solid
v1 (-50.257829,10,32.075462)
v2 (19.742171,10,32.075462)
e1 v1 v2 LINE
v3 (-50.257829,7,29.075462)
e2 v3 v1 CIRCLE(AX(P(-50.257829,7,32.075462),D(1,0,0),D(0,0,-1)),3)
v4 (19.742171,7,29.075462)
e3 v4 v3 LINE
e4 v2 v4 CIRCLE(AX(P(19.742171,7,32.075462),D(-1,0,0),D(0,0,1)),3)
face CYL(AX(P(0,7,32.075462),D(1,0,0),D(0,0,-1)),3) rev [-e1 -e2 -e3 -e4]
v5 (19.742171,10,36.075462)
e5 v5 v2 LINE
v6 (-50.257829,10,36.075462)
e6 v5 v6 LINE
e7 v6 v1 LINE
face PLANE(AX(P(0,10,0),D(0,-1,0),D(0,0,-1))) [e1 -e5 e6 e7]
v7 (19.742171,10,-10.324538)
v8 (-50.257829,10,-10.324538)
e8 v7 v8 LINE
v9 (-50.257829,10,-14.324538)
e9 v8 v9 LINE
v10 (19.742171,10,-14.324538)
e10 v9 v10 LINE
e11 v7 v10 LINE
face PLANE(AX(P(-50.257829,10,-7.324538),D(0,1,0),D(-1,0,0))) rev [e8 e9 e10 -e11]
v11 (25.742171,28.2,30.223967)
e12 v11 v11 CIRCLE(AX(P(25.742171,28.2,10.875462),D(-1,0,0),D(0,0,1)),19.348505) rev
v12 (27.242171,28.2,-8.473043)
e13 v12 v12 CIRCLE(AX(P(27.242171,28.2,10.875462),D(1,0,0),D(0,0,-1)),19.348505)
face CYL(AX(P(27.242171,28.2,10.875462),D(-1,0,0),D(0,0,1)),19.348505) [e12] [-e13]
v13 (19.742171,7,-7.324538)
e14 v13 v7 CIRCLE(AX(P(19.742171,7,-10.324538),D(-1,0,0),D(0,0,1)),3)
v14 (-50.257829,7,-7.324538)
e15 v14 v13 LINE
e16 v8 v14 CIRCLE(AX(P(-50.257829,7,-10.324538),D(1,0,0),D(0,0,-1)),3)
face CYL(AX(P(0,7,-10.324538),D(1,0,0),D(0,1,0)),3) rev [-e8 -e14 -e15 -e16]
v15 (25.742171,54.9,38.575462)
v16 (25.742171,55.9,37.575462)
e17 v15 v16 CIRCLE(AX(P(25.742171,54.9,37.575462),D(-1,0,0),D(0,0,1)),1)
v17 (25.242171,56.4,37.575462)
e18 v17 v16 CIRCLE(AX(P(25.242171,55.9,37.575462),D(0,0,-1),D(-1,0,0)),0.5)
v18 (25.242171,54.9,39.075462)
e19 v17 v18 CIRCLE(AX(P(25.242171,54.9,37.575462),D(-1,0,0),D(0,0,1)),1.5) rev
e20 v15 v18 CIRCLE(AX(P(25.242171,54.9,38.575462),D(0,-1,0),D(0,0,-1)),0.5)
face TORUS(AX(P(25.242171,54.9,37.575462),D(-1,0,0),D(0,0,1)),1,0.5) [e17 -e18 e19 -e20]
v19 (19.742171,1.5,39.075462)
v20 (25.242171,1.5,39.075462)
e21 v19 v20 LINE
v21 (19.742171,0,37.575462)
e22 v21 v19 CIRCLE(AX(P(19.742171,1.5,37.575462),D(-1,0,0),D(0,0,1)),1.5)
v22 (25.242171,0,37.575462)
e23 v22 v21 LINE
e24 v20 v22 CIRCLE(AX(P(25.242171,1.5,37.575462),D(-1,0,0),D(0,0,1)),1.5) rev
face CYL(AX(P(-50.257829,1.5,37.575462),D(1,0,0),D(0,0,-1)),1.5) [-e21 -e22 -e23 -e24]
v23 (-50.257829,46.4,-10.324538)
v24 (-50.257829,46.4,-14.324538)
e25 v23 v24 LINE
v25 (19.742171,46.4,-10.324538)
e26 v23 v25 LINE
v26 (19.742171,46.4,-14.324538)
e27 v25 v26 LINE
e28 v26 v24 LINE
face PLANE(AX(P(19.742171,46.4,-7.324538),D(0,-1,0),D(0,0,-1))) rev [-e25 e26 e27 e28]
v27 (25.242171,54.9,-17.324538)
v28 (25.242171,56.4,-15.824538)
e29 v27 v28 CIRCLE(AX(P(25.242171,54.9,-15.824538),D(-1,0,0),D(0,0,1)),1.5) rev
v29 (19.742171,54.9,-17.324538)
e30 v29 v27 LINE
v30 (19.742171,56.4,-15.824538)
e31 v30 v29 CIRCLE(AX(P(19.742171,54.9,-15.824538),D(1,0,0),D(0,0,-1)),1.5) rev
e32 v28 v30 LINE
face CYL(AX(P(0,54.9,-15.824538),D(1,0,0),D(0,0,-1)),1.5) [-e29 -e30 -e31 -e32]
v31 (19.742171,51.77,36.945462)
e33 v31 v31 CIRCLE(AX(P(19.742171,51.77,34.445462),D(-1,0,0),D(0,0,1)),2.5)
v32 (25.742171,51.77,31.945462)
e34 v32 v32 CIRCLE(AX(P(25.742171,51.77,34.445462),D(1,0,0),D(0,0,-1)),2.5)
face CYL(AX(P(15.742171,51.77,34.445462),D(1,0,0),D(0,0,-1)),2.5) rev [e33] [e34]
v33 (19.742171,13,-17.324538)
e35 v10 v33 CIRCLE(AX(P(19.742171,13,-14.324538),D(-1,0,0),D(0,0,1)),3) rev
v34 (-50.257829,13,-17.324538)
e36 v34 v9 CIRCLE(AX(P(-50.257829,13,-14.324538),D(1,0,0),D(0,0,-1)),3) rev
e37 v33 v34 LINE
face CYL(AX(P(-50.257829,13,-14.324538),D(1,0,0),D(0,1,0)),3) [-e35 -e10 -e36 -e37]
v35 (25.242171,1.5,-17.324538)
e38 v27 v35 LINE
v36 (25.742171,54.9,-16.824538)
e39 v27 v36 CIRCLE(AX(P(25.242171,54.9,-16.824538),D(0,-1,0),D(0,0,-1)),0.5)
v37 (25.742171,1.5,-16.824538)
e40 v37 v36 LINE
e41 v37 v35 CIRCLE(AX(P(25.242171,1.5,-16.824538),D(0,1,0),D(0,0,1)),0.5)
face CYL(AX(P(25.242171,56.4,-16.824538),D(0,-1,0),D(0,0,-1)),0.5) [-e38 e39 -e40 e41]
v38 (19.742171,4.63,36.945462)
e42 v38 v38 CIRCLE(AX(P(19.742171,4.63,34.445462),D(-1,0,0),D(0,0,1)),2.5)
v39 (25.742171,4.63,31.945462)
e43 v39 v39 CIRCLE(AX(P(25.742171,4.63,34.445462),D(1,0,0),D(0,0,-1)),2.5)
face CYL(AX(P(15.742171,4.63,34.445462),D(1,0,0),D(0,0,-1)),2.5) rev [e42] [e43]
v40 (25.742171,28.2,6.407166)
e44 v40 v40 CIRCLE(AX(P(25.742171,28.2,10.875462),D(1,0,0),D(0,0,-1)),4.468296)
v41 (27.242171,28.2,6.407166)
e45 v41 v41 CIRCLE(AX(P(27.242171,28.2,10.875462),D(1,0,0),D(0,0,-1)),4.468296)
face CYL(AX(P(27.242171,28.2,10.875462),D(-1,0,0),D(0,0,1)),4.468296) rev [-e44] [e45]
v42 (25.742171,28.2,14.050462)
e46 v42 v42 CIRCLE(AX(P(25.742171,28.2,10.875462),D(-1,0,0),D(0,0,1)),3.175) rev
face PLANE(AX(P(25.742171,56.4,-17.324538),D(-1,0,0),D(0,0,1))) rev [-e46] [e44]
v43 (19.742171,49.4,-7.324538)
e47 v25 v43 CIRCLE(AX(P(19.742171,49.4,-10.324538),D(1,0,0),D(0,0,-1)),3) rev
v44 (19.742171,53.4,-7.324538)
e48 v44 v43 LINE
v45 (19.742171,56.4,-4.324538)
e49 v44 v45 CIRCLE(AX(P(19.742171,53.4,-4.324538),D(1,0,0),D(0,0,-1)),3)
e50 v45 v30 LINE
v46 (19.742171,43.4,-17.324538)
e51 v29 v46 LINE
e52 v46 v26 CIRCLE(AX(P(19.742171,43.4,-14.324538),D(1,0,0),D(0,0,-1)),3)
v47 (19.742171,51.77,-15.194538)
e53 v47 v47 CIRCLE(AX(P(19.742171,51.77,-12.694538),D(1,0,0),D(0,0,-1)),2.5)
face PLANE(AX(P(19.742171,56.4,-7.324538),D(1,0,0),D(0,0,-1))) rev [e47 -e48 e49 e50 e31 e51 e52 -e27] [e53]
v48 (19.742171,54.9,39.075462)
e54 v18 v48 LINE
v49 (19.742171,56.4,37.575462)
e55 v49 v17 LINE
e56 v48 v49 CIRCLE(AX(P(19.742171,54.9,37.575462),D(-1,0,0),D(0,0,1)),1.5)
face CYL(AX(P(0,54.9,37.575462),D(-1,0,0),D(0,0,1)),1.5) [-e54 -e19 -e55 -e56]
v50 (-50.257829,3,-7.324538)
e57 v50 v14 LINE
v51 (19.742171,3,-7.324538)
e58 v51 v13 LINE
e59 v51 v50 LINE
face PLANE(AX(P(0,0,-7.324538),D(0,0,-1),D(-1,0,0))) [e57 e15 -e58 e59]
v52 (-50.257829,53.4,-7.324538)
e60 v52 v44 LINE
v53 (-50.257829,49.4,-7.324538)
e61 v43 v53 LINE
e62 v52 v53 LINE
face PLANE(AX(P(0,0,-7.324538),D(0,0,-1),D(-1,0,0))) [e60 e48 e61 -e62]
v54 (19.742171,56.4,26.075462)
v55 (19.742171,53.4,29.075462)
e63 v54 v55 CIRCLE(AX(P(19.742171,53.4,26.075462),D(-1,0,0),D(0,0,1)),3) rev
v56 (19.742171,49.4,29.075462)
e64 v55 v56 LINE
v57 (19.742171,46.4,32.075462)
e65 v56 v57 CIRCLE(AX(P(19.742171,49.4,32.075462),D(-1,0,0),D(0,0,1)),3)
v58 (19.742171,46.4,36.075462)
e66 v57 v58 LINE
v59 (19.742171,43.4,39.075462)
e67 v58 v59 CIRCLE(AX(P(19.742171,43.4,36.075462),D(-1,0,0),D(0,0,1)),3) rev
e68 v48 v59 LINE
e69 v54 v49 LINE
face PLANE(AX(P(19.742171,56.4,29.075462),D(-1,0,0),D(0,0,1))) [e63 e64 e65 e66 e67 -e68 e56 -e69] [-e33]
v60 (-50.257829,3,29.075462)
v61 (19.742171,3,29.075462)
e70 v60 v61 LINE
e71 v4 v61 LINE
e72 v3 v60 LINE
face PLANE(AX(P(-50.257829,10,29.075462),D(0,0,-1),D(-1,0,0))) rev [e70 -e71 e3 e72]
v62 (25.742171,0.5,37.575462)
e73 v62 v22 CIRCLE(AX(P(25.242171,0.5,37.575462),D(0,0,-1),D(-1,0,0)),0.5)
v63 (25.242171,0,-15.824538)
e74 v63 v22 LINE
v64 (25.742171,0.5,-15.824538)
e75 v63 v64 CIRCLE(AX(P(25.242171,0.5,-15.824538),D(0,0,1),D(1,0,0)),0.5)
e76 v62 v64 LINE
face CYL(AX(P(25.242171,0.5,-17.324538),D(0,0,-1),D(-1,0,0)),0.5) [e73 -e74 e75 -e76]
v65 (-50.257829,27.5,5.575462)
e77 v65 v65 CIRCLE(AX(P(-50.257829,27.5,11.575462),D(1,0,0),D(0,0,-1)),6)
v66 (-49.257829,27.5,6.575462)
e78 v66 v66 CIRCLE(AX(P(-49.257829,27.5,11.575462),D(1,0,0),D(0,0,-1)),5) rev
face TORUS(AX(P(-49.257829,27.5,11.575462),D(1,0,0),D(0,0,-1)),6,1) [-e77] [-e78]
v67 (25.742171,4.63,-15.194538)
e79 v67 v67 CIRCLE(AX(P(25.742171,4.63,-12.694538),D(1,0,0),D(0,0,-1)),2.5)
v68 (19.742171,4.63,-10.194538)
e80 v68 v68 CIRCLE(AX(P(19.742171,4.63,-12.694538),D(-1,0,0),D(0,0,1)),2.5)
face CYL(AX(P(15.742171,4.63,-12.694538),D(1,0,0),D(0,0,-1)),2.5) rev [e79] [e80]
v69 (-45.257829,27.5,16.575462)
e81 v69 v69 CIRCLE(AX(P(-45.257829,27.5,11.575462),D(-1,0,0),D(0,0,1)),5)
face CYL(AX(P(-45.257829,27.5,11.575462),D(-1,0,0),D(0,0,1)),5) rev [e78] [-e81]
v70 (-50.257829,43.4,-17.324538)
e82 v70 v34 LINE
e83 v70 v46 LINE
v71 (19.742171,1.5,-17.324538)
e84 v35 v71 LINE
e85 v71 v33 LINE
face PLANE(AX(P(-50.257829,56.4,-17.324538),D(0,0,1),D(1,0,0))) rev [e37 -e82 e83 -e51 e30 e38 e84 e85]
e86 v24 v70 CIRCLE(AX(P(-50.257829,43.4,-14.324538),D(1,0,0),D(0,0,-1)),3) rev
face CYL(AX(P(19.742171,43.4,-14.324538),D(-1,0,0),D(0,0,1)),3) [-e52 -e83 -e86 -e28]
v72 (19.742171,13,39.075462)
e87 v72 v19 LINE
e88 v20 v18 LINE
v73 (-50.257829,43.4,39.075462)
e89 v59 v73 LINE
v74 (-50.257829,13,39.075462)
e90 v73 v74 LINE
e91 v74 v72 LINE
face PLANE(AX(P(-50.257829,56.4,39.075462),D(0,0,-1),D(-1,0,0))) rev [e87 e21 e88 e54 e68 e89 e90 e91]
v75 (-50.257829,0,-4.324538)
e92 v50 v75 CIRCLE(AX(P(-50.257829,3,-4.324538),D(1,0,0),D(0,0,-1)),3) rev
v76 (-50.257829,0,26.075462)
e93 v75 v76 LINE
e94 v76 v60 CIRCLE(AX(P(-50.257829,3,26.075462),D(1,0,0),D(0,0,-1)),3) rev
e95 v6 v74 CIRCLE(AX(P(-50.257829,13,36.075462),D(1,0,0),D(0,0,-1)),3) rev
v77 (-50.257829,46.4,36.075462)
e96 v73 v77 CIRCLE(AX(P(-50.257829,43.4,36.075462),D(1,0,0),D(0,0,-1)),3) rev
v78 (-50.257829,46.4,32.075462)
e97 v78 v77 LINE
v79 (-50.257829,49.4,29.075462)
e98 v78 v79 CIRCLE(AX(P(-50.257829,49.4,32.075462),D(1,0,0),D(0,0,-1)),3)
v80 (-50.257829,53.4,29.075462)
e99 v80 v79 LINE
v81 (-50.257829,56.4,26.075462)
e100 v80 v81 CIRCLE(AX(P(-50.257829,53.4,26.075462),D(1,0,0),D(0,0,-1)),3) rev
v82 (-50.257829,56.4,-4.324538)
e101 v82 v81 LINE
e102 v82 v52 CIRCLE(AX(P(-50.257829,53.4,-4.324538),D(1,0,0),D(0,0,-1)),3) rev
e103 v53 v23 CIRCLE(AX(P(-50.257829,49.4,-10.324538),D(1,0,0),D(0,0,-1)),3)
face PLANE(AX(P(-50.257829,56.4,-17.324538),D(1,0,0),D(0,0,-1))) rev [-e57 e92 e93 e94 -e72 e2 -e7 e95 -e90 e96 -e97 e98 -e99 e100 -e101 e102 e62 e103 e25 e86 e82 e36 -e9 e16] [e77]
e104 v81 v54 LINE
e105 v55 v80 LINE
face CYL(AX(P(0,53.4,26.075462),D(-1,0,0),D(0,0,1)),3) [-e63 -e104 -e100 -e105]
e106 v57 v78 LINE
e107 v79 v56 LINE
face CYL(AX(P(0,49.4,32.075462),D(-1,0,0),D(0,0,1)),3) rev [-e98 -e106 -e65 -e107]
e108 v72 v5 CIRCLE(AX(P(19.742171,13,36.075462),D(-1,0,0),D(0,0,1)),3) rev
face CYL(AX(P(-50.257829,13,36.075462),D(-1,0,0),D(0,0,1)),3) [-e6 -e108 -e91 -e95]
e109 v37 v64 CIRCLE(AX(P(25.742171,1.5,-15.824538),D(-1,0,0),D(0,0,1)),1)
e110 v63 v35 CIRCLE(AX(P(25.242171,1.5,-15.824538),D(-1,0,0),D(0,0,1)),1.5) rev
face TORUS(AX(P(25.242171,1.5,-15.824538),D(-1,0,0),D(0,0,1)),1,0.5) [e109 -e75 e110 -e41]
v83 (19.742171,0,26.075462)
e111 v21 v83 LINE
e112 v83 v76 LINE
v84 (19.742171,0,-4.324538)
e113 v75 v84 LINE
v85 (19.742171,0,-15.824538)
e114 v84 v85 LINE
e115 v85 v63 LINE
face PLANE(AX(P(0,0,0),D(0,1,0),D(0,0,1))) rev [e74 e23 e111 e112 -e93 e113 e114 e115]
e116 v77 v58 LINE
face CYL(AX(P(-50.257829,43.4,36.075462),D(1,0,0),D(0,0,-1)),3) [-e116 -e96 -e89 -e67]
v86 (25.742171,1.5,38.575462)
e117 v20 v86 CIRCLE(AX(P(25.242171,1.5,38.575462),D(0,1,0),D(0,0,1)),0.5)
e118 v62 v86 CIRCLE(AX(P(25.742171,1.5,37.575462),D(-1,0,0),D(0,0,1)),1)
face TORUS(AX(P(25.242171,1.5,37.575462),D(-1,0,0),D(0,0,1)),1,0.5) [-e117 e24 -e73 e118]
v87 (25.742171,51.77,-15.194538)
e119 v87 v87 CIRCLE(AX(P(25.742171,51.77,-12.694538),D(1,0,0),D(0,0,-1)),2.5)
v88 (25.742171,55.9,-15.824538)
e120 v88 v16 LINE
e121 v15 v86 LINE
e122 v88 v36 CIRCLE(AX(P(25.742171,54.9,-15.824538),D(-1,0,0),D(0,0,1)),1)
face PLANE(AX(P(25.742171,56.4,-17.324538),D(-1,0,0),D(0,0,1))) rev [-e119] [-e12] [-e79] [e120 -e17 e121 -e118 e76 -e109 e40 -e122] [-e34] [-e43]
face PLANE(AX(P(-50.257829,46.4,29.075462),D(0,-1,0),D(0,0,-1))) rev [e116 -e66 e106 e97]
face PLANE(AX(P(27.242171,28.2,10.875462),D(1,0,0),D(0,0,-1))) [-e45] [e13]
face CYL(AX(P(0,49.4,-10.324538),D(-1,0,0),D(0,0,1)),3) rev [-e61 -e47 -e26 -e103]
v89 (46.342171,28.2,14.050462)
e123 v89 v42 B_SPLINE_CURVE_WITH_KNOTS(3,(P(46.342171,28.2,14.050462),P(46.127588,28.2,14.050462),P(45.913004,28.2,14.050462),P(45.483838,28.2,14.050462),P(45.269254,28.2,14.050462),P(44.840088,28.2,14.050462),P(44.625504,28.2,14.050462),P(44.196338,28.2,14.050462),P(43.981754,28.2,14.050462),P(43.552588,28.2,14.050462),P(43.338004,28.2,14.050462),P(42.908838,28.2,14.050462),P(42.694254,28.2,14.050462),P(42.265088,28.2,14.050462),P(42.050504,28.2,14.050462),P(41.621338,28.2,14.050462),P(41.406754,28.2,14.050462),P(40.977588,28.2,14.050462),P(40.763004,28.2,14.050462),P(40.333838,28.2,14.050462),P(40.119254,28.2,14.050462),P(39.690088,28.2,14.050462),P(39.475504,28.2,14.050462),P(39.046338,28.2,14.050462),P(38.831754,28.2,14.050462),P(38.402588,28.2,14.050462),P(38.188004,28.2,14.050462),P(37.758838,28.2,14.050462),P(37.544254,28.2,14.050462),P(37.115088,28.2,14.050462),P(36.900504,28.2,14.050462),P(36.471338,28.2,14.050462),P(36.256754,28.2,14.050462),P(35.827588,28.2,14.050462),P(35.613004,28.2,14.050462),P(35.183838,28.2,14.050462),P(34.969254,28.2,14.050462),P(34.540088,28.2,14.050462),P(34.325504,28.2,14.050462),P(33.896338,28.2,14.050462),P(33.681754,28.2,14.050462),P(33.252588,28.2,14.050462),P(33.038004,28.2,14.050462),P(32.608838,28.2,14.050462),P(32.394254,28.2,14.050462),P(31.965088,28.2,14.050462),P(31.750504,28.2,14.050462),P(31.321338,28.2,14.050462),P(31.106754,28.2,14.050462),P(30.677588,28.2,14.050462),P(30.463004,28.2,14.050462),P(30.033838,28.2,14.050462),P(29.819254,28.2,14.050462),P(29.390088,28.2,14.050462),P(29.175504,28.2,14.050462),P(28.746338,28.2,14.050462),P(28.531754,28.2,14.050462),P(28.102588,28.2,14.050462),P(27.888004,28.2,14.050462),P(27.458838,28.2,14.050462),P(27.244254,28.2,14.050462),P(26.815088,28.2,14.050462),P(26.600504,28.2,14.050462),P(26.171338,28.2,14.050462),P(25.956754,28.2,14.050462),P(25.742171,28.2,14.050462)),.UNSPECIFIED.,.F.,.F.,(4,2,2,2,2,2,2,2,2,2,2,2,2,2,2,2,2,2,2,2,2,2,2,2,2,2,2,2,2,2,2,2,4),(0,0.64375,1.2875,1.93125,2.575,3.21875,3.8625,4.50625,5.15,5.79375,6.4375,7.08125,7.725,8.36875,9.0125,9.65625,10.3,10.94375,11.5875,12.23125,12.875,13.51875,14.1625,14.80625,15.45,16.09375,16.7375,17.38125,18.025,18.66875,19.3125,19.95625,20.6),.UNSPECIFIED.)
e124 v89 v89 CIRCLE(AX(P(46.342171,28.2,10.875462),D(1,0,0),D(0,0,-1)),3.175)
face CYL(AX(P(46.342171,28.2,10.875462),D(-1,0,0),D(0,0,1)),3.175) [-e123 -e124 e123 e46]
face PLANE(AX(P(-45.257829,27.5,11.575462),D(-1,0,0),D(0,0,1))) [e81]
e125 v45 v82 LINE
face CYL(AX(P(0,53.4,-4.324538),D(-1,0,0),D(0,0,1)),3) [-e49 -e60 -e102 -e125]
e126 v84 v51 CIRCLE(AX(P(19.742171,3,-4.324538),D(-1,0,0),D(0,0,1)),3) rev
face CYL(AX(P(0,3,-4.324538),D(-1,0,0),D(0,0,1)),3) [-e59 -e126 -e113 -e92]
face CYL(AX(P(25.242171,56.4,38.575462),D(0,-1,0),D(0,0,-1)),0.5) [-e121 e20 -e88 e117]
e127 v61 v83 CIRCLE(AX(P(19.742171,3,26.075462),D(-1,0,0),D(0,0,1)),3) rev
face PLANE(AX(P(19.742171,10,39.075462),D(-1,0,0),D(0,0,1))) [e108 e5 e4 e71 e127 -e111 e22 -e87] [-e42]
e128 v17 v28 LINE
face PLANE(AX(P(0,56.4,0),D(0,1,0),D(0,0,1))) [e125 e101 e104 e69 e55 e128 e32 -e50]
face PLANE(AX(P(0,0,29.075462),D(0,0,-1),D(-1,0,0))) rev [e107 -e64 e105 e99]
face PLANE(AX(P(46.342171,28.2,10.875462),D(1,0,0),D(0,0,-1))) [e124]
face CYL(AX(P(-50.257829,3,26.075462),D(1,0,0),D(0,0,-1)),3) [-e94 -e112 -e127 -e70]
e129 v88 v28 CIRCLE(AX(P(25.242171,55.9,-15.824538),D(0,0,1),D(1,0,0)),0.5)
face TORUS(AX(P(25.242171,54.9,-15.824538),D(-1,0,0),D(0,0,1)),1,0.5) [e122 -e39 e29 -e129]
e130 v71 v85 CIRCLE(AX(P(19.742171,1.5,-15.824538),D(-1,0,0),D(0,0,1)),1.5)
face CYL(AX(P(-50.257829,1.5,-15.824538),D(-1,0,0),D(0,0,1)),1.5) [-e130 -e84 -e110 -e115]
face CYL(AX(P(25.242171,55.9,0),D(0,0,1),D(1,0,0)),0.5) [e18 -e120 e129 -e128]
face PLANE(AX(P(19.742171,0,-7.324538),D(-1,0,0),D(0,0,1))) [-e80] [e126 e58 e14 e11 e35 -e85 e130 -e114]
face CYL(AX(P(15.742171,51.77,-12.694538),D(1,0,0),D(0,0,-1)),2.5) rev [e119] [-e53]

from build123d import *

# Parameters (mm, degrees)
SKETCH1_W           = 76
SKETCH1_H           = 56.4
BOSS_EXTRUDE1_DEPTH = 56.4
SKETCH2_W           = 70
SKETCH2_H           = 10
CUT_EXTRUDE1_DEPTH  = 10
SKETCH3_W           = 70
SKETCH3_H           = 10
CUT_EXTRUDE4_DEPTH  = 10
SKETCH5_W           = 70
SKETCH5_H           = 10
CUT_EXTRUDE5_DEPTH  = 10
FILLET2_R           = 3
FILLET3_R           = 3
SKETCH7_R           = 5
CUT_EXTRUDE6_DEPTH  = 5
FILLET4_R           = 1
FILLET5_R           = 0.5
FILLET6_R           = 1.5
FILLET7_R           = 1.5
SKETCH18_R          = 2.5
CUT_EXTRUDE7_DEPTH  = 10
SKETCH20_R          = 3.175
BOSS_EXTRUDE2_DEPTH = 20.6
SKETCH21_R          = 19.348505468
SKETCH21_R_2        = 4.468295999
BOSS_EXTRUDE3_DEPTH = 1.5


with BuildPart() as part:
    # Sketch1 → Boss-Extrude1 (new body)
    with BuildSketch(Plane(origin=(0, 0, 0), x_dir=(1, 0, 0), z_dir=(0, 1, 0))):
        with Locations((-12.257828935, -10.875461997)):
            Rectangle(SKETCH1_W, SKETCH1_H)
    extrude(amount=BOSS_EXTRUDE1_DEPTH)

    # Sketch2 → Cut-Extrude1 (cut)
    with BuildSketch(Plane.XY.offset(39.075461997)):
        with Locations((-15.257828935, 51.4)):
            Rectangle(SKETCH2_W, SKETCH2_H)
    extrude(amount=-CUT_EXTRUDE1_DEPTH, mode=Mode.SUBTRACT)

    # Sketch3 → Cut-Extrude4 (cut)
    with BuildSketch(Plane(origin=(0, 0, -17.324538003), x_dir=(-1, 0, 0), z_dir=(0, 0, -1))):
        with Locations((15.257828935, 51.4)):
            Rectangle(SKETCH3_W, SKETCH3_H)
        with Locations((15.257828935, 5)):
            Rectangle(SKETCH3_W, SKETCH3_H)
    extrude(amount=-CUT_EXTRUDE4_DEPTH, mode=Mode.SUBTRACT)

    # Sketch5 → Cut-Extrude5 (cut)
    with BuildSketch(Plane.XZ):
        with Locations((-15.257828935, 34.075461997)):
            Rectangle(SKETCH5_W, SKETCH5_H)
    extrude(amount=-CUT_EXTRUDE5_DEPTH, mode=Mode.SUBTRACT)

    # Fillet2
    fillet2_edges = [part.edges().sort_by_distance(p)[0] for p in [
        (-15.257828935, 56.4, 29.075461997),
        (-15.257828935, 46.4, 39.075461997),
        (-15.257828935, 0, -7.324538003),
        (-15.257828935, 10, -17.324538003),
        (-15.257828935, 56.4, -7.324538003),
        (-15.257828935, 46.4, -17.324538003),
        (-15.257828935, 10, 39.075461997),
        (-15.257828935, 0, 29.075461997),
    ]]
    fillet(fillet2_edges, radius=FILLET2_R)

    # Fillet3
    fillet3_edges = [part.edges().sort_by_distance(p)[0] for p in [
        (-15.257828935, 46.4, 29.075461997),
        (-15.257828935, 10, -7.324538003),
        (-15.257828935, 46.4, -7.324538003),
        (-15.257828935, 10, 29.075461997),
    ]]
    fillet(fillet3_edges, radius=FILLET3_R)

    # Sketch7 → Cut-Extrude6 (cut)
    with BuildSketch(Plane.ZY.offset(50.257828935)):
        with Locations((11.575461997, 27.5)):
            Circle(SKETCH7_R)
    extrude(amount=-CUT_EXTRUDE6_DEPTH, mode=Mode.SUBTRACT)

    # Fillet4
    fillet4_edges = [part.edges().sort_by_distance(p)[0] for p in [
        (-50.257828935, 27.5, 6.575461997),
    ]]
    fillet(fillet4_edges, radius=FILLET4_R)

    # Fillet5
    fillet5_edges = [part.edges().sort_by_distance(p)[0] for p in [
        (25.742171065, 56.4, 10.875461997),
        (25.742171065, 0, 10.875461997),
        (25.742171065, 28.2, -17.324538003),
        (25.742171065, 28.2, 39.075461997),
    ]]
    fillet(fillet5_edges, radius=FILLET5_R)

    # Fillet6
    # the kernel refuses this fillet: 1.5 mm, written as the material it takes off along each edge
    with BuildSketch(Plane(origin=(25.742171065, 54.9, 37.575461997), x_dir=(0, 1, 0), z_dir=(0, 0, -1))) as fillet6_piece_1:
        with BuildLine():
            CenterArc((1, -0.5), 0.5, 0, 90)
            Line((1.5, -0.5), (1.5, 0))
            Line((1.5, 0), (1, 0))
        make_face()
    revolve(axis=Axis((25.742171065, 54.9, 37.575461997), (1, 0, 0)), revolution_arc=90, mode=Mode.SUBTRACT)
    with BuildSketch(Plane(origin=(25.742171065, 56.4, 39.075461997), x_dir=(0, -1, 0), z_dir=(-1, 0, 0))) as fillet6_piece_2:
        with BuildLine():
            CenterArc((FILLET6_R, -FILLET6_R), FILLET6_R, 90, 90)
            Line((0, -FILLET6_R), (0, 0))
            Line((0, 0), (FILLET6_R, 0))
        make_face()
    extrude(amount=9.75, mode=Mode.SUBTRACT)

    # Fillet7
    # the kernel refuses this fillet: 1.5 mm, written as the material it takes off along each edge
    with BuildSketch(Plane(origin=(25.742171065, 1.5, 37.575461997), x_dir=(0, 0, 1), z_dir=(0, 1, 0))) as fillet7_piece_1:
        with BuildLine():
            CenterArc((1, -0.5), 0.5, 0, 90)
            Line((1.5, -0.5), (1.5, 0))
            Line((1.5, 0), (1, 0))
        make_face()
    revolve(axis=Axis((25.742171065, 1.5, 37.575461997), (1, 0, 0)), revolution_arc=90, mode=Mode.SUBTRACT)
    with BuildSketch(Plane(origin=(25.742171065, 54.9, -15.824538003), x_dir=(0, 0, -1), z_dir=(0, -1, 0))) as fillet7_piece_2:
        with BuildLine():
            CenterArc((1, -0.5), 0.5, 0, 90)
            Line((1.5, -0.5), (1.5, 0))
            Line((1.5, 0), (1, 0))
        make_face()
    revolve(axis=Axis((25.742171065, 54.9, -15.824538003), (1, 0, 0)), revolution_arc=90, mode=Mode.SUBTRACT)
    with BuildSketch(Plane(origin=(25.742171065, 1.5, -15.824538003), x_dir=(0, -1, 0), z_dir=(0, 0, 1))) as fillet7_piece_3:
        with BuildLine():
            CenterArc((1, -0.5), 0.5, 0, 90)
            Line((1.5, -0.5), (1.5, 0))
            Line((1.5, 0), (1, 0))
        make_face()
    revolve(axis=Axis((25.742171065, 1.5, -15.824538003), (1, 0, 0)), revolution_arc=90, mode=Mode.SUBTRACT)
    with BuildSketch(Plane(origin=(15.992171065, 56.4, -17.324538003), x_dir=(0, -1, 0), z_dir=(1, 0, 0)), Plane(origin=(15.992171065, 0, -17.324538003), x_dir=(0, 0, 1), z_dir=(1, 0, 0)), Plane(origin=(25.742171065, 0, 39.075461997), x_dir=(0, 0, -1), z_dir=(-1, 0, 0))) as fillet7_piece_4:
        with BuildLine():
            CenterArc((FILLET7_R, -FILLET7_R), FILLET7_R, 90, 90)
            Line((0, -FILLET7_R), (0, 0))
            Line((0, 0), (FILLET7_R, 0))
        make_face()
    extrude(amount=9.75, mode=Mode.SUBTRACT)

    # Sketch18 → Cut-Extrude7 (cut)
    with BuildSketch(Plane(origin=(25.742171065, 0, 0), x_dir=(0, 0, -1), z_dir=(1, 0, 0))):
        with Locations((-34.445461997, 51.77)):
            Circle(SKETCH18_R)
        with Locations((12.694538003, 51.77)):
            Circle(SKETCH18_R)
        with Locations((12.694538003, 4.63)):
            Circle(SKETCH18_R)
        with Locations((-34.445461997, 4.63)):
            Circle(SKETCH18_R)
    extrude(amount=-CUT_EXTRUDE7_DEPTH, mode=Mode.SUBTRACT)

    # Sketch20 → Boss-Extrude2 (add)
    with BuildSketch(Plane(origin=(25.742171065, 0, 0), x_dir=(0, 0, -1), z_dir=(1, 0, 0))):
        with Locations(Location((-10.875461997, 28.2, 0), (0, 0, 180))):
            Circle(SKETCH20_R)
    extrude(amount=BOSS_EXTRUDE2_DEPTH)

    # Sketch21 → Boss-Extrude3 (add)
    with BuildSketch(Plane(origin=(25.742171065, 0, 0), x_dir=(0, 0, -1), z_dir=(1, 0, 0))):
        with Locations(Location((-10.875461997, 28.2, 0), (0, 0, 180))):
            Circle(SKETCH21_R)
        with Locations((-10.875461997, 28.2)):
            Circle(SKETCH21_R_2, mode=Mode.SUBTRACT)
    extrude(amount=BOSS_EXTRUDE3_DEPTH)


solid = part.part
